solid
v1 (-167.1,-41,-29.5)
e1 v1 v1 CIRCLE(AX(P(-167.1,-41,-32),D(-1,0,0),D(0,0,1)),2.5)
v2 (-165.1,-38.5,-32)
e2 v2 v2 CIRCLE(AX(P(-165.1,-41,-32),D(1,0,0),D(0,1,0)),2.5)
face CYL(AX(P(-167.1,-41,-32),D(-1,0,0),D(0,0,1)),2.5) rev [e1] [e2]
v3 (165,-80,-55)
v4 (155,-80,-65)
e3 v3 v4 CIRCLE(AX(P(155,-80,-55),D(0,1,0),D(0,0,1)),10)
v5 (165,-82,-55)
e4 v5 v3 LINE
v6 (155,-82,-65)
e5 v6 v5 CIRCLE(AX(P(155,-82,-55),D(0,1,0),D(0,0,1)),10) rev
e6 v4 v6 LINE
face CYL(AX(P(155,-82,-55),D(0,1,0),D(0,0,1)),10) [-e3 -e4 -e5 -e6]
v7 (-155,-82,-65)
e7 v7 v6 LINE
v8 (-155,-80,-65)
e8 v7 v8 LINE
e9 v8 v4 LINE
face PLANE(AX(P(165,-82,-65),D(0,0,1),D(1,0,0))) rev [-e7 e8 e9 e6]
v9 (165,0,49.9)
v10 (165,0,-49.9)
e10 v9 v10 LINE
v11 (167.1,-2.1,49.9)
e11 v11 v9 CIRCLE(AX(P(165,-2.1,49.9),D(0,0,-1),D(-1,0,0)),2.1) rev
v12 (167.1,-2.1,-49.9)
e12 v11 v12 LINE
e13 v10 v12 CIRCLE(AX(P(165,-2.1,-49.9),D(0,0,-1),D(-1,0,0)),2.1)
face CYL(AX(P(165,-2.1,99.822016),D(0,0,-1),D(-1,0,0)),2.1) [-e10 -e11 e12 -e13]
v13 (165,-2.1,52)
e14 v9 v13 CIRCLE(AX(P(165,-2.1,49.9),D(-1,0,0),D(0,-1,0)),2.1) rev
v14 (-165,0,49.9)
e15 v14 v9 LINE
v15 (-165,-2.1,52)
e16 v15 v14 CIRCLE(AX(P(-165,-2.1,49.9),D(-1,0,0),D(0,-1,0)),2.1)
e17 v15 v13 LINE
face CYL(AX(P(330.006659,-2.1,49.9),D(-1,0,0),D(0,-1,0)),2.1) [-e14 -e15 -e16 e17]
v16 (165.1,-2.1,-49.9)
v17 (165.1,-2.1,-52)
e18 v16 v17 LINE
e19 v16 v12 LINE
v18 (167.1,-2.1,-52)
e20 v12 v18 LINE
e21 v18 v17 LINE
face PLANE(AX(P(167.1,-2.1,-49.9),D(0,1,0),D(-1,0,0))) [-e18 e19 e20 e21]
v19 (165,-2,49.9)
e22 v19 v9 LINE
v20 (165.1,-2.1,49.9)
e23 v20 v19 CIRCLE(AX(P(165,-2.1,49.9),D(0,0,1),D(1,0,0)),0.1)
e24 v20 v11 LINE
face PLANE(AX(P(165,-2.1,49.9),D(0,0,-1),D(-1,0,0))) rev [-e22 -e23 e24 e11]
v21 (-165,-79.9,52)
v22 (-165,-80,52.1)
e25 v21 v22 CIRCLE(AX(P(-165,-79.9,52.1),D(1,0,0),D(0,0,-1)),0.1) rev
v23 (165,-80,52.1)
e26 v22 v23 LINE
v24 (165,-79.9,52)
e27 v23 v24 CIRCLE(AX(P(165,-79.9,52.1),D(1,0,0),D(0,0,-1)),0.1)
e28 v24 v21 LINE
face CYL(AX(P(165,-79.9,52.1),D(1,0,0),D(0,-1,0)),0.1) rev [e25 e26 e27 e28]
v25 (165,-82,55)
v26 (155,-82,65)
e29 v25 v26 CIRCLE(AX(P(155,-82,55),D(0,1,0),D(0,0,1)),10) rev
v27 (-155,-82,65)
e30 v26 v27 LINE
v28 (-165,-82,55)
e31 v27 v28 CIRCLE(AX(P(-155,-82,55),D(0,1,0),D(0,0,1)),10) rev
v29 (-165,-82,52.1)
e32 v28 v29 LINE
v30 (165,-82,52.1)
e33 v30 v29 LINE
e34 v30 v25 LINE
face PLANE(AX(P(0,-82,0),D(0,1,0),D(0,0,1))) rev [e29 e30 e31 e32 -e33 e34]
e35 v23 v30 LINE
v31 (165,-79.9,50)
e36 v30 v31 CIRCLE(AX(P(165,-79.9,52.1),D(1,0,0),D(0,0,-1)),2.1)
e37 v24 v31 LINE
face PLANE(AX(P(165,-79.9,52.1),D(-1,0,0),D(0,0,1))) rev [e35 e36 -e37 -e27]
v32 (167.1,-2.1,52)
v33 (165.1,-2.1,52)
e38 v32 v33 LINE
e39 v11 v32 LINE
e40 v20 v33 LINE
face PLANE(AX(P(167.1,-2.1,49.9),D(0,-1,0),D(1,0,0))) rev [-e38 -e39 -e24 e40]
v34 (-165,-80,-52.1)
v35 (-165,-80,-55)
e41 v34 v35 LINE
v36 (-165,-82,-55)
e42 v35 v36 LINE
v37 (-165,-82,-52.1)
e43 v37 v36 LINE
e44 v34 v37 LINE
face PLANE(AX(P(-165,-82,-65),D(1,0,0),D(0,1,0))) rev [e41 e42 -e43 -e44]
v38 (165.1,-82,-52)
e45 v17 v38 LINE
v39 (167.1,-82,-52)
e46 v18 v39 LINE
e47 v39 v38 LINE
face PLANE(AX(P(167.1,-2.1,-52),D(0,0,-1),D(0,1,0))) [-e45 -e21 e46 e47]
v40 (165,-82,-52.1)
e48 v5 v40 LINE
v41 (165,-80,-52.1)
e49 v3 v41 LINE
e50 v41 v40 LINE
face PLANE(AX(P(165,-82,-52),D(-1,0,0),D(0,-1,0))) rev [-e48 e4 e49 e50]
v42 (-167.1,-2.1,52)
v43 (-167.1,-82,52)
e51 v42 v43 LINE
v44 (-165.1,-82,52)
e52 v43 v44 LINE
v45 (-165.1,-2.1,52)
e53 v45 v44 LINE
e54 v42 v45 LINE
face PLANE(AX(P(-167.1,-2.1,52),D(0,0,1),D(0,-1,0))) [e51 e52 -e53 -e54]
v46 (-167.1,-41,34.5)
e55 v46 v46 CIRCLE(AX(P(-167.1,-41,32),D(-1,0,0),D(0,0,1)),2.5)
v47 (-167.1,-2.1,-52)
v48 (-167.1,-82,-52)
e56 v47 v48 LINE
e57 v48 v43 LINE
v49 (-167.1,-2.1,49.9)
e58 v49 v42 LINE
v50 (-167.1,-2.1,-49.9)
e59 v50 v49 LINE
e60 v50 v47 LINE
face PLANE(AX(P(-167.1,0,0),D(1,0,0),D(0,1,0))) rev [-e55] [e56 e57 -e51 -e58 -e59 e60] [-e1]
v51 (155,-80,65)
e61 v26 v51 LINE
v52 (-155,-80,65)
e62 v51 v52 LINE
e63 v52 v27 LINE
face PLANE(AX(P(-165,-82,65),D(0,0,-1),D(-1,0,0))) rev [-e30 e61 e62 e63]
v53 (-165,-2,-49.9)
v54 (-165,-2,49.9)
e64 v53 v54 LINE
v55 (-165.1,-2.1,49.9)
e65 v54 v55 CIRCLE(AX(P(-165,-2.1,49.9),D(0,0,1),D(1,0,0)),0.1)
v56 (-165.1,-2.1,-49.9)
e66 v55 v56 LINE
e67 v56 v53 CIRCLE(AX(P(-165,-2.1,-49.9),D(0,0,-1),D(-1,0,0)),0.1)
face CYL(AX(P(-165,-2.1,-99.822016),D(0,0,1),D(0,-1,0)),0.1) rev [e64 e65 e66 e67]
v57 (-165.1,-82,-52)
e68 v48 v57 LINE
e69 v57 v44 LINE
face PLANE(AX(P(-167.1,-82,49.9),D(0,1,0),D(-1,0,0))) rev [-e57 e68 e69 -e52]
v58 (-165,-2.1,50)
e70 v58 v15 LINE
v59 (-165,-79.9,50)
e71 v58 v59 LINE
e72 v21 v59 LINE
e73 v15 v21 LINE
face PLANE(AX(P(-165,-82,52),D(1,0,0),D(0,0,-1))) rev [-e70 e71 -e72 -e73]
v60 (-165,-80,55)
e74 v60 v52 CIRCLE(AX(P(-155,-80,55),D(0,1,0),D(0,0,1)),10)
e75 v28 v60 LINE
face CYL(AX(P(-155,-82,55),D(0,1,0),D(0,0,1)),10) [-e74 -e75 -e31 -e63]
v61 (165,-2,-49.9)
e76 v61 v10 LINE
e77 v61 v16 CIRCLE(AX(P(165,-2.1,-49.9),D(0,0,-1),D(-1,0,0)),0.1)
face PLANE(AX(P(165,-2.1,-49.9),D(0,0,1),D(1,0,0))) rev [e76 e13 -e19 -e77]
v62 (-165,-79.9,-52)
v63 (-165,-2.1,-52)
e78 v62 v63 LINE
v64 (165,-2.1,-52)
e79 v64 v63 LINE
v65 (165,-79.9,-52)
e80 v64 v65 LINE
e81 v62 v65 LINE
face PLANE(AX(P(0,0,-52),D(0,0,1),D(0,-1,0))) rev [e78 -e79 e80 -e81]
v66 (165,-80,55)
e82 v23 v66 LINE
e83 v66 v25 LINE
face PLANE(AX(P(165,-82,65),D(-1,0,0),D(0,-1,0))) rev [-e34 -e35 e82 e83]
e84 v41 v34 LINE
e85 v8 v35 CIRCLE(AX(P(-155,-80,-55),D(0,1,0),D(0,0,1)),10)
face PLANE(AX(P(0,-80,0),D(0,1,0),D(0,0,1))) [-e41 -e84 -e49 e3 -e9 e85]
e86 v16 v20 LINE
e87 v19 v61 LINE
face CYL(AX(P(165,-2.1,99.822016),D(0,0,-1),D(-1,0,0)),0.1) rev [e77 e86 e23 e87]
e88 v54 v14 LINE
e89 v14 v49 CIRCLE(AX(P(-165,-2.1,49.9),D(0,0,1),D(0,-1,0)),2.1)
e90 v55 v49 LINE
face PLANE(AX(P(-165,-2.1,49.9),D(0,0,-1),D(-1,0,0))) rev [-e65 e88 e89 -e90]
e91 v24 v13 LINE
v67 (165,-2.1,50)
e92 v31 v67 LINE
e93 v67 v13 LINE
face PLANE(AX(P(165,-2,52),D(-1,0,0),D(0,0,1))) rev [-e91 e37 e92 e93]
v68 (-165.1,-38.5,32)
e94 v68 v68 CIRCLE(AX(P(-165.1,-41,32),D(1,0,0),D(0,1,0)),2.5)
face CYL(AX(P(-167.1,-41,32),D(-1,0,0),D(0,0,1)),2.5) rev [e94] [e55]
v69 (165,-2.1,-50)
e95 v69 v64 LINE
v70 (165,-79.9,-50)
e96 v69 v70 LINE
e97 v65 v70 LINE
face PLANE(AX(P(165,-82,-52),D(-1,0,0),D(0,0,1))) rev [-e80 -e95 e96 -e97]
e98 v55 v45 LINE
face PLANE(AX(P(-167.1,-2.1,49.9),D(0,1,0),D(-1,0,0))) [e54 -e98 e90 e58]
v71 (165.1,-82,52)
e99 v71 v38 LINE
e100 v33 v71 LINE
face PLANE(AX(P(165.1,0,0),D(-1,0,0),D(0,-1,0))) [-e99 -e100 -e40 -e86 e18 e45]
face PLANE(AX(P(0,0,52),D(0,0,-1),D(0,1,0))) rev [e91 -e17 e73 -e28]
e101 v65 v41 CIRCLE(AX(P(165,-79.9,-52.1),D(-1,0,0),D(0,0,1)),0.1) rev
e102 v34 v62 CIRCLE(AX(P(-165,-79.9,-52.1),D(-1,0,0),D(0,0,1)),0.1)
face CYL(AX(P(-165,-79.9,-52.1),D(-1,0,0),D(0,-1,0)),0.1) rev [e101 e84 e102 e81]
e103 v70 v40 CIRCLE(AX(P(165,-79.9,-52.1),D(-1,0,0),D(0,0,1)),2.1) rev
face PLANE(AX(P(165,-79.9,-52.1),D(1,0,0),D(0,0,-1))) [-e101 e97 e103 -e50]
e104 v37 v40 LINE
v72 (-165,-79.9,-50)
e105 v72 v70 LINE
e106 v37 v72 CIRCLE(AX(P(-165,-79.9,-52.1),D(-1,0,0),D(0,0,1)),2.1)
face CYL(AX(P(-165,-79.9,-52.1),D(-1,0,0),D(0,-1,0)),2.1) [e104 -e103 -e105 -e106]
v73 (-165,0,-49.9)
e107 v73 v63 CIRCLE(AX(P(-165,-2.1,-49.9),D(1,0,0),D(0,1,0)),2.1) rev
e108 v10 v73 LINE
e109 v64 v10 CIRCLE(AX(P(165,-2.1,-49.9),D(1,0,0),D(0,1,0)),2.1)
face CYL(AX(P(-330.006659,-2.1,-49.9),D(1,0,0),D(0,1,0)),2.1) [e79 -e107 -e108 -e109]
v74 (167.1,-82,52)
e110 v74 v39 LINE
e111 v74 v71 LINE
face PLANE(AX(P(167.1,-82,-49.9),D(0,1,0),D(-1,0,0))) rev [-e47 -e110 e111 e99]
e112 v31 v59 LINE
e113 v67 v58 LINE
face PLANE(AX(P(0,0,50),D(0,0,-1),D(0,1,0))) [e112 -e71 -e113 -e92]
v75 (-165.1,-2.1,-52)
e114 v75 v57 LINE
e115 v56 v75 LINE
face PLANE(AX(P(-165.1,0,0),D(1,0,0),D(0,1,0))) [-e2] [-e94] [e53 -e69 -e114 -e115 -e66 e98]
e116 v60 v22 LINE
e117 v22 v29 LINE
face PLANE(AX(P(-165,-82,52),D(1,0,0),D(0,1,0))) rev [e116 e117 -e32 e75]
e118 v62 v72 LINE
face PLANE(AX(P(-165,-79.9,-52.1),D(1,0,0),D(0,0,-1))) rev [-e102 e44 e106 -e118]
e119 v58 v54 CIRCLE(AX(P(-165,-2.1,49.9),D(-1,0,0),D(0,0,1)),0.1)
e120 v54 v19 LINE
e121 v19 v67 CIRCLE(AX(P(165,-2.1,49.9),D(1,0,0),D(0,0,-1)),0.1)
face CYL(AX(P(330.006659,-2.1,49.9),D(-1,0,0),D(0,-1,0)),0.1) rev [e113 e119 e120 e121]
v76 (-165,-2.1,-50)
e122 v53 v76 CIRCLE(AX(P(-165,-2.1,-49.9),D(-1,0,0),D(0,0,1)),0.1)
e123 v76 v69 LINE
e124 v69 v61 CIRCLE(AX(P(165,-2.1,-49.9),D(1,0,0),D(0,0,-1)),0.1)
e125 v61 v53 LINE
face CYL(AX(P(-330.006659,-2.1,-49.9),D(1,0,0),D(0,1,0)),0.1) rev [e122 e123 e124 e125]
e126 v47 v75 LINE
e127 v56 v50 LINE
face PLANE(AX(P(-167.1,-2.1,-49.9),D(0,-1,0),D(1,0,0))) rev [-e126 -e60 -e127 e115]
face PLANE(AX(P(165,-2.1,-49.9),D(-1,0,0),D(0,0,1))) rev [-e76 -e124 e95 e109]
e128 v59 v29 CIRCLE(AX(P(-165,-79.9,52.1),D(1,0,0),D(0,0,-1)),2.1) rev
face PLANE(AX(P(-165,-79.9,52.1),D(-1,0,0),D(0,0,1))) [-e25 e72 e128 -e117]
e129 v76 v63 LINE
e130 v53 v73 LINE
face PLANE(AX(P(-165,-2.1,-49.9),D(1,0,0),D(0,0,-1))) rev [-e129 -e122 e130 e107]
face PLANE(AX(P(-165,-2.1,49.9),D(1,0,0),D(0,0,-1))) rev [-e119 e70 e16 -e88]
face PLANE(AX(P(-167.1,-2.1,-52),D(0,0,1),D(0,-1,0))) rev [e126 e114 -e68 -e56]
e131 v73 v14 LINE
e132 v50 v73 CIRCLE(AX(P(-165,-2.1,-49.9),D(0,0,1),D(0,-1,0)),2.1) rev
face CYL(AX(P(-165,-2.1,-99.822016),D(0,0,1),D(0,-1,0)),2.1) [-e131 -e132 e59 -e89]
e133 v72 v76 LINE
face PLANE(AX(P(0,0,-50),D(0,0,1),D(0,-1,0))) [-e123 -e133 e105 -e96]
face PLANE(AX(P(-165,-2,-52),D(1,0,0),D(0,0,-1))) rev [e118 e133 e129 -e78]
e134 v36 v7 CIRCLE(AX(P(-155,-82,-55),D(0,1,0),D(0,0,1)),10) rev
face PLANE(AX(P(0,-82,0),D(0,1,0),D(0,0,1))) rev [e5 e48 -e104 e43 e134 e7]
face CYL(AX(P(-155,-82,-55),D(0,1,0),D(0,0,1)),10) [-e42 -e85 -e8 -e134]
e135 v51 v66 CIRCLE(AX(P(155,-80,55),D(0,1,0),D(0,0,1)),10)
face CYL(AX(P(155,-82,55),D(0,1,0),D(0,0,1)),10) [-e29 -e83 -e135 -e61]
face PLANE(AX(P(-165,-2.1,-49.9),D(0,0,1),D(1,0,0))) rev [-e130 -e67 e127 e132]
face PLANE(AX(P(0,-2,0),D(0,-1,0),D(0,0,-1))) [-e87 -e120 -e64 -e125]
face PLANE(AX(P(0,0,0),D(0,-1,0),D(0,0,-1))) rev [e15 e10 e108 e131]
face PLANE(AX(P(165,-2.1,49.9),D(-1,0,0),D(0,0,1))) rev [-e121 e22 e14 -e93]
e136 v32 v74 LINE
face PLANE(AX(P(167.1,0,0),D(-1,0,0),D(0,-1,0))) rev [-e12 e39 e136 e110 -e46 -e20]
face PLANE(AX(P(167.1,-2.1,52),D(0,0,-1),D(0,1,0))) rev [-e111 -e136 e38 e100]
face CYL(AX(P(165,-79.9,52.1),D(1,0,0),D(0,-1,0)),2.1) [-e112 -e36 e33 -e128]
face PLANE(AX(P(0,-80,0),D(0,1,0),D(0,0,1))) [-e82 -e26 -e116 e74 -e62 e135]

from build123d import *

# Parameters (mm, degrees)
SKIZZE3_W                          = 330
SKIZZE3_H                          = 100
BASIS_BLECH1_DEPTH                 = 2
KANTE_LASCHE1_STRIP_W              = 8.2
KANTE_LASCHE1_STRIP_H              = 2
KANTE_LASCHE1_STRIP_CUT_DEPTH      = 330
KANTE_LASCHE1_STRIP_2_W            = 8.2
KANTE_LASCHE1_STRIP_2_H            = 2
KANTE_LASCHE1_STRIP_CUT_2_DEPTH    = 330
KANTE_LASCHE1_DEPTH                = 330
KANTE_LASCHE1_BEND_DEPTH           = 330
KANTE_LASCHE5_DEPTH                = 99.8
KANTE_LASCHE5_BEND_DEPTH           = 99.8
KANTE_LASCHE3_STRIP_W              = 8.2
KANTE_LASCHE3_STRIP_H              = 2
KANTE_LASCHE3_STRIP_CUT_DEPTH      = 330
KANTE_LASCHE3_STRIP_2_W            = 8.2
KANTE_LASCHE3_STRIP_2_H            = 2
KANTE_LASCHE3_STRIP_CUT_2_DEPTH    = 330
KANTE_LASCHE3_DEPTH                = 330
KANTE_LASCHE3_BEND_DEPTH           = 330
VERRUNDUNG2_R                      = 10
F_5_0_5_DURCHMESSER_BOHRUNG1_D     = 5
F_5_0_5_DURCHMESSER_BOHRUNG1_DEPTH = 10
F_5_0_5_DURCHMESSER_BOHRUNG1_TIP   = 1.502151548
GESCHLOSSENE_START                 = -52
GESCHLOSSENE_ECKE2_OUTLINE_W       = 2
GESCHLOSSENE_ECKE2_OUTLINE_H       = 79.9
GESCHLOSSENE_ECKE2_DEPTH           = 2.1
GESCHLOSSENE_START_2               = 49.9
GESCHLOSSENE_ECKE2_2_OUTLINE_W     = 2
GESCHLOSSENE_ECKE2_2_OUTLINE_H     = 79.9
GESCHLOSSENE_ECKE2_2_DEPTH         = 2.1


# Read off the part's stored shape, not the designer's step: Geschlossene Ecke2
# Sheet-metal steps are written as plain solids
with BuildPart() as part:
    # Skizze3 → Basis-Blech1 (new body)
    with BuildSketch(Plane(origin=(0, 0, 0), x_dir=(1, 0, 0), z_dir=(0, 1, 0))):
        Rectangle(SKIZZE3_W, SKIZZE3_H)
    extrude(amount=-BASIS_BLECH1_DEPTH)

    # Kante-Lasche1 strip (across the edge) → Kante-Lasche1 strip cut (cut)
    with BuildSketch(Plane(origin=(-165, -2, -50), x_dir=(0, 0, 1), z_dir=(1, 0, 0))):
        with Locations((-4, -1)):
            Rectangle(KANTE_LASCHE1_STRIP_W, KANTE_LASCHE1_STRIP_H)
    extrude(amount=KANTE_LASCHE1_STRIP_CUT_DEPTH, mode=Mode.SUBTRACT)

    # Kante-Lasche1 strip 2 (across the edge) → Kante-Lasche1 strip cut 2 (cut)
    with BuildSketch(Plane(origin=(165, -2, 50), x_dir=(0, 0, -1), z_dir=(-1, 0, 0))):
        with Locations((-4, -1)):
            Rectangle(KANTE_LASCHE1_STRIP_2_W, KANTE_LASCHE1_STRIP_2_H)
    extrude(amount=KANTE_LASCHE1_STRIP_CUT_2_DEPTH, mode=Mode.SUBTRACT)

    # Kante-Lasche1 section (across the edge) → Kante-Lasche1 (add)
    with BuildSketch(Plane(origin=(-165, -2, -50), x_dir=(0, 0, 1), z_dir=(1, 0, 0))):
        with BuildLine():
            Line((-2, 0.1), (-2, 80))
            Line((-2, 80), (0, 80))
            Line((0, 80), (0, 0.1))
            ThreePointArc((0, 0.1), (0.029289322, 0.029289322), (0.1, 0))
            Line((0.1, 0), (0.1, -2))
            ThreePointArc((0.1, -2), (-1.38492424, -1.38492424), (-2, 0.1))
        make_face()
    extrude(amount=KANTE_LASCHE1_DEPTH)

    # Kante-Lasche1 section 2 (across the edge) → Kante-Lasche1 bend (add)
    with BuildSketch(Plane(origin=(165, -2, 50), x_dir=(0, 0, -1), z_dir=(-1, 0, 0))):
        with BuildLine():
            Line((-2, 0.1), (-2, 80))
            Line((-2, 80), (0, 80))
            Line((0, 80), (0, 0.1))
            ThreePointArc((0, 0.1), (0.029289322, 0.029289322), (0.1, 0))
            Line((0.1, 0), (0.1, -2))
            ThreePointArc((0.1, -2), (-1.38492424, -1.38492424), (-2, 0.1))
        make_face()
    extrude(amount=KANTE_LASCHE1_BEND_DEPTH)

    # Kante-Lasche5 section (across the edge) → Kante-Lasche5 (add)
    with BuildSketch(Plane(origin=(-165.1, -2, 49.9), x_dir=(1, 0, 0), z_dir=(0, 0, -1))):
        with BuildLine():
            Line((-2, 0.1), (-2, 80))
            Line((-2, 80), (0, 80))
            Line((0, 80), (0, 0.1))
            ThreePointArc((0, 0.1), (0.029289322, 0.029289322), (0.1, 0))
            Line((0.1, 0), (0.1, -2))
            ThreePointArc((0.1, -2), (-1.38492424, -1.38492424), (-2, 0.1))
        make_face()
    extrude(amount=KANTE_LASCHE5_DEPTH)

    # Kante-Lasche5 section 2 (across the edge) → Kante-Lasche5 bend (add)
    with BuildSketch(Plane(origin=(165.1, -2, -49.9), x_dir=(-1, 0, 0), z_dir=(0, 0, 1))):
        with BuildLine():
            Line((-2, 0.1), (-2, 80))
            Line((-2, 80), (0, 80))
            Line((0, 80), (0, 0.1))
            ThreePointArc((0, 0.1), (0.029289322, 0.029289322), (0.1, 0))
            Line((0.1, 0), (0.1, -2))
            ThreePointArc((0.1, -2), (-1.38492424, -1.38492424), (-2, 0.1))
        make_face()
    extrude(amount=KANTE_LASCHE5_BEND_DEPTH)

    # Kante-Lasche3 strip (across the edge) → Kante-Lasche3 strip cut (cut)
    with BuildSketch(Plane(origin=(-165, -82, 52), x_dir=(0, 1, 0), z_dir=(1, 0, 0))):
        with Locations((-2, -1)):
            Rectangle(KANTE_LASCHE3_STRIP_W, KANTE_LASCHE3_STRIP_H)
    extrude(amount=KANTE_LASCHE3_STRIP_CUT_DEPTH, mode=Mode.SUBTRACT)

    # Kante-Lasche3 strip 2 (across the edge) → Kante-Lasche3 strip cut 2 (cut)
    with BuildSketch(Plane(origin=(165, -82, -52), x_dir=(0, 1, 0), z_dir=(-1, 0, 0))):
        with Locations((-2, -1)):
            Rectangle(KANTE_LASCHE3_STRIP_2_W, KANTE_LASCHE3_STRIP_2_H)
    extrude(amount=KANTE_LASCHE3_STRIP_CUT_2_DEPTH, mode=Mode.SUBTRACT)

    # Kante-Lasche3 section (across the edge) → Kante-Lasche3 (add)
    with BuildSketch(Plane(origin=(-165, -82, 52), x_dir=(0, 1, 0), z_dir=(1, 0, 0))):
        with BuildLine():
            Line((0, 0.1), (0, 13))
            Line((0, 13), (2, 13))
            Line((2, 13), (2, 0.1))
            ThreePointArc((2, 0.1), (2.029289322, 0.029289322), (2.1, 0))
            Line((2.1, 0), (2.1, -2))
            ThreePointArc((2.1, -2), (0.61507576, -1.38492424), (0, 0.1))
        make_face()
    extrude(amount=KANTE_LASCHE3_DEPTH)

    # Kante-Lasche3 section 2 (across the edge) → Kante-Lasche3 bend (add)
    with BuildSketch(Plane(origin=(165, -82, -52), x_dir=(0, 1, 0), z_dir=(-1, 0, 0))):
        with BuildLine():
            Line((0, 0.1), (0, 13))
            Line((0, 13), (2, 13))
            Line((2, 13), (2, 0.1))
            ThreePointArc((2, 0.1), (2.029289322, 0.029289322), (2.1, 0))
            Line((2.1, 0), (2.1, -2))
            ThreePointArc((2.1, -2), (0.61507576, -1.38492424), (0, 0.1))
        make_face()
    extrude(amount=KANTE_LASCHE3_BEND_DEPTH)

    # Verrundung2
    verrundung2_edges = [part.edges().sort_by_distance(p)[0] for p in [
        (-165, -81, 65),
        (165, -81, 65),
        (165, -81, -65),
        (-165, -81, -65),
    ]]
    fillet(verrundung2_edges, radius=VERRUNDUNG2_R)

    # Ø5.0 (5) Durchmesser Bohrung1
    with Locations(Plane.ZY.offset(167.1)):
        with Locations((32, -41), (-32, -41)):
            Hole(F_5_0_5_DURCHMESSER_BOHRUNG1_D / 2, depth=F_5_0_5_DURCHMESSER_BOHRUNG1_DEPTH)
            with Locations((0, 0, -(F_5_0_5_DURCHMESSER_BOHRUNG1_DEPTH + F_5_0_5_DURCHMESSER_BOHRUNG1_TIP / 2))):  # 118° drill point
                Cone(0, F_5_0_5_DURCHMESSER_BOHRUNG1_D / 2, F_5_0_5_DURCHMESSER_BOHRUNG1_TIP, mode=Mode.SUBTRACT)

    # Geschlossene Ecke2 outline → Geschlossene Ecke2 (add)
    with BuildSketch(Plane.XY.offset(GESCHLOSSENE_START)):
        with Locations((-166.1, -42.05)):
            Rectangle(GESCHLOSSENE_ECKE2_OUTLINE_W, GESCHLOSSENE_ECKE2_OUTLINE_H)
        with Locations((166.1, -42.05)):
            Rectangle(GESCHLOSSENE_ECKE2_OUTLINE_W, GESCHLOSSENE_ECKE2_OUTLINE_H)
    extrude(amount=GESCHLOSSENE_ECKE2_DEPTH)

    # Geschlossene Ecke2 2 outline → Geschlossene Ecke2 2 (add)
    with BuildSketch(Plane.XY.offset(GESCHLOSSENE_START_2)):
        with Locations((-166.1, -42.05)):
            Rectangle(GESCHLOSSENE_ECKE2_2_OUTLINE_W, GESCHLOSSENE_ECKE2_2_OUTLINE_H)
        with Locations((166.1, -42.05)):
            Rectangle(GESCHLOSSENE_ECKE2_2_OUTLINE_W, GESCHLOSSENE_ECKE2_2_OUTLINE_H)
    extrude(amount=GESCHLOSSENE_ECKE2_2_DEPTH)


solid = part.part
